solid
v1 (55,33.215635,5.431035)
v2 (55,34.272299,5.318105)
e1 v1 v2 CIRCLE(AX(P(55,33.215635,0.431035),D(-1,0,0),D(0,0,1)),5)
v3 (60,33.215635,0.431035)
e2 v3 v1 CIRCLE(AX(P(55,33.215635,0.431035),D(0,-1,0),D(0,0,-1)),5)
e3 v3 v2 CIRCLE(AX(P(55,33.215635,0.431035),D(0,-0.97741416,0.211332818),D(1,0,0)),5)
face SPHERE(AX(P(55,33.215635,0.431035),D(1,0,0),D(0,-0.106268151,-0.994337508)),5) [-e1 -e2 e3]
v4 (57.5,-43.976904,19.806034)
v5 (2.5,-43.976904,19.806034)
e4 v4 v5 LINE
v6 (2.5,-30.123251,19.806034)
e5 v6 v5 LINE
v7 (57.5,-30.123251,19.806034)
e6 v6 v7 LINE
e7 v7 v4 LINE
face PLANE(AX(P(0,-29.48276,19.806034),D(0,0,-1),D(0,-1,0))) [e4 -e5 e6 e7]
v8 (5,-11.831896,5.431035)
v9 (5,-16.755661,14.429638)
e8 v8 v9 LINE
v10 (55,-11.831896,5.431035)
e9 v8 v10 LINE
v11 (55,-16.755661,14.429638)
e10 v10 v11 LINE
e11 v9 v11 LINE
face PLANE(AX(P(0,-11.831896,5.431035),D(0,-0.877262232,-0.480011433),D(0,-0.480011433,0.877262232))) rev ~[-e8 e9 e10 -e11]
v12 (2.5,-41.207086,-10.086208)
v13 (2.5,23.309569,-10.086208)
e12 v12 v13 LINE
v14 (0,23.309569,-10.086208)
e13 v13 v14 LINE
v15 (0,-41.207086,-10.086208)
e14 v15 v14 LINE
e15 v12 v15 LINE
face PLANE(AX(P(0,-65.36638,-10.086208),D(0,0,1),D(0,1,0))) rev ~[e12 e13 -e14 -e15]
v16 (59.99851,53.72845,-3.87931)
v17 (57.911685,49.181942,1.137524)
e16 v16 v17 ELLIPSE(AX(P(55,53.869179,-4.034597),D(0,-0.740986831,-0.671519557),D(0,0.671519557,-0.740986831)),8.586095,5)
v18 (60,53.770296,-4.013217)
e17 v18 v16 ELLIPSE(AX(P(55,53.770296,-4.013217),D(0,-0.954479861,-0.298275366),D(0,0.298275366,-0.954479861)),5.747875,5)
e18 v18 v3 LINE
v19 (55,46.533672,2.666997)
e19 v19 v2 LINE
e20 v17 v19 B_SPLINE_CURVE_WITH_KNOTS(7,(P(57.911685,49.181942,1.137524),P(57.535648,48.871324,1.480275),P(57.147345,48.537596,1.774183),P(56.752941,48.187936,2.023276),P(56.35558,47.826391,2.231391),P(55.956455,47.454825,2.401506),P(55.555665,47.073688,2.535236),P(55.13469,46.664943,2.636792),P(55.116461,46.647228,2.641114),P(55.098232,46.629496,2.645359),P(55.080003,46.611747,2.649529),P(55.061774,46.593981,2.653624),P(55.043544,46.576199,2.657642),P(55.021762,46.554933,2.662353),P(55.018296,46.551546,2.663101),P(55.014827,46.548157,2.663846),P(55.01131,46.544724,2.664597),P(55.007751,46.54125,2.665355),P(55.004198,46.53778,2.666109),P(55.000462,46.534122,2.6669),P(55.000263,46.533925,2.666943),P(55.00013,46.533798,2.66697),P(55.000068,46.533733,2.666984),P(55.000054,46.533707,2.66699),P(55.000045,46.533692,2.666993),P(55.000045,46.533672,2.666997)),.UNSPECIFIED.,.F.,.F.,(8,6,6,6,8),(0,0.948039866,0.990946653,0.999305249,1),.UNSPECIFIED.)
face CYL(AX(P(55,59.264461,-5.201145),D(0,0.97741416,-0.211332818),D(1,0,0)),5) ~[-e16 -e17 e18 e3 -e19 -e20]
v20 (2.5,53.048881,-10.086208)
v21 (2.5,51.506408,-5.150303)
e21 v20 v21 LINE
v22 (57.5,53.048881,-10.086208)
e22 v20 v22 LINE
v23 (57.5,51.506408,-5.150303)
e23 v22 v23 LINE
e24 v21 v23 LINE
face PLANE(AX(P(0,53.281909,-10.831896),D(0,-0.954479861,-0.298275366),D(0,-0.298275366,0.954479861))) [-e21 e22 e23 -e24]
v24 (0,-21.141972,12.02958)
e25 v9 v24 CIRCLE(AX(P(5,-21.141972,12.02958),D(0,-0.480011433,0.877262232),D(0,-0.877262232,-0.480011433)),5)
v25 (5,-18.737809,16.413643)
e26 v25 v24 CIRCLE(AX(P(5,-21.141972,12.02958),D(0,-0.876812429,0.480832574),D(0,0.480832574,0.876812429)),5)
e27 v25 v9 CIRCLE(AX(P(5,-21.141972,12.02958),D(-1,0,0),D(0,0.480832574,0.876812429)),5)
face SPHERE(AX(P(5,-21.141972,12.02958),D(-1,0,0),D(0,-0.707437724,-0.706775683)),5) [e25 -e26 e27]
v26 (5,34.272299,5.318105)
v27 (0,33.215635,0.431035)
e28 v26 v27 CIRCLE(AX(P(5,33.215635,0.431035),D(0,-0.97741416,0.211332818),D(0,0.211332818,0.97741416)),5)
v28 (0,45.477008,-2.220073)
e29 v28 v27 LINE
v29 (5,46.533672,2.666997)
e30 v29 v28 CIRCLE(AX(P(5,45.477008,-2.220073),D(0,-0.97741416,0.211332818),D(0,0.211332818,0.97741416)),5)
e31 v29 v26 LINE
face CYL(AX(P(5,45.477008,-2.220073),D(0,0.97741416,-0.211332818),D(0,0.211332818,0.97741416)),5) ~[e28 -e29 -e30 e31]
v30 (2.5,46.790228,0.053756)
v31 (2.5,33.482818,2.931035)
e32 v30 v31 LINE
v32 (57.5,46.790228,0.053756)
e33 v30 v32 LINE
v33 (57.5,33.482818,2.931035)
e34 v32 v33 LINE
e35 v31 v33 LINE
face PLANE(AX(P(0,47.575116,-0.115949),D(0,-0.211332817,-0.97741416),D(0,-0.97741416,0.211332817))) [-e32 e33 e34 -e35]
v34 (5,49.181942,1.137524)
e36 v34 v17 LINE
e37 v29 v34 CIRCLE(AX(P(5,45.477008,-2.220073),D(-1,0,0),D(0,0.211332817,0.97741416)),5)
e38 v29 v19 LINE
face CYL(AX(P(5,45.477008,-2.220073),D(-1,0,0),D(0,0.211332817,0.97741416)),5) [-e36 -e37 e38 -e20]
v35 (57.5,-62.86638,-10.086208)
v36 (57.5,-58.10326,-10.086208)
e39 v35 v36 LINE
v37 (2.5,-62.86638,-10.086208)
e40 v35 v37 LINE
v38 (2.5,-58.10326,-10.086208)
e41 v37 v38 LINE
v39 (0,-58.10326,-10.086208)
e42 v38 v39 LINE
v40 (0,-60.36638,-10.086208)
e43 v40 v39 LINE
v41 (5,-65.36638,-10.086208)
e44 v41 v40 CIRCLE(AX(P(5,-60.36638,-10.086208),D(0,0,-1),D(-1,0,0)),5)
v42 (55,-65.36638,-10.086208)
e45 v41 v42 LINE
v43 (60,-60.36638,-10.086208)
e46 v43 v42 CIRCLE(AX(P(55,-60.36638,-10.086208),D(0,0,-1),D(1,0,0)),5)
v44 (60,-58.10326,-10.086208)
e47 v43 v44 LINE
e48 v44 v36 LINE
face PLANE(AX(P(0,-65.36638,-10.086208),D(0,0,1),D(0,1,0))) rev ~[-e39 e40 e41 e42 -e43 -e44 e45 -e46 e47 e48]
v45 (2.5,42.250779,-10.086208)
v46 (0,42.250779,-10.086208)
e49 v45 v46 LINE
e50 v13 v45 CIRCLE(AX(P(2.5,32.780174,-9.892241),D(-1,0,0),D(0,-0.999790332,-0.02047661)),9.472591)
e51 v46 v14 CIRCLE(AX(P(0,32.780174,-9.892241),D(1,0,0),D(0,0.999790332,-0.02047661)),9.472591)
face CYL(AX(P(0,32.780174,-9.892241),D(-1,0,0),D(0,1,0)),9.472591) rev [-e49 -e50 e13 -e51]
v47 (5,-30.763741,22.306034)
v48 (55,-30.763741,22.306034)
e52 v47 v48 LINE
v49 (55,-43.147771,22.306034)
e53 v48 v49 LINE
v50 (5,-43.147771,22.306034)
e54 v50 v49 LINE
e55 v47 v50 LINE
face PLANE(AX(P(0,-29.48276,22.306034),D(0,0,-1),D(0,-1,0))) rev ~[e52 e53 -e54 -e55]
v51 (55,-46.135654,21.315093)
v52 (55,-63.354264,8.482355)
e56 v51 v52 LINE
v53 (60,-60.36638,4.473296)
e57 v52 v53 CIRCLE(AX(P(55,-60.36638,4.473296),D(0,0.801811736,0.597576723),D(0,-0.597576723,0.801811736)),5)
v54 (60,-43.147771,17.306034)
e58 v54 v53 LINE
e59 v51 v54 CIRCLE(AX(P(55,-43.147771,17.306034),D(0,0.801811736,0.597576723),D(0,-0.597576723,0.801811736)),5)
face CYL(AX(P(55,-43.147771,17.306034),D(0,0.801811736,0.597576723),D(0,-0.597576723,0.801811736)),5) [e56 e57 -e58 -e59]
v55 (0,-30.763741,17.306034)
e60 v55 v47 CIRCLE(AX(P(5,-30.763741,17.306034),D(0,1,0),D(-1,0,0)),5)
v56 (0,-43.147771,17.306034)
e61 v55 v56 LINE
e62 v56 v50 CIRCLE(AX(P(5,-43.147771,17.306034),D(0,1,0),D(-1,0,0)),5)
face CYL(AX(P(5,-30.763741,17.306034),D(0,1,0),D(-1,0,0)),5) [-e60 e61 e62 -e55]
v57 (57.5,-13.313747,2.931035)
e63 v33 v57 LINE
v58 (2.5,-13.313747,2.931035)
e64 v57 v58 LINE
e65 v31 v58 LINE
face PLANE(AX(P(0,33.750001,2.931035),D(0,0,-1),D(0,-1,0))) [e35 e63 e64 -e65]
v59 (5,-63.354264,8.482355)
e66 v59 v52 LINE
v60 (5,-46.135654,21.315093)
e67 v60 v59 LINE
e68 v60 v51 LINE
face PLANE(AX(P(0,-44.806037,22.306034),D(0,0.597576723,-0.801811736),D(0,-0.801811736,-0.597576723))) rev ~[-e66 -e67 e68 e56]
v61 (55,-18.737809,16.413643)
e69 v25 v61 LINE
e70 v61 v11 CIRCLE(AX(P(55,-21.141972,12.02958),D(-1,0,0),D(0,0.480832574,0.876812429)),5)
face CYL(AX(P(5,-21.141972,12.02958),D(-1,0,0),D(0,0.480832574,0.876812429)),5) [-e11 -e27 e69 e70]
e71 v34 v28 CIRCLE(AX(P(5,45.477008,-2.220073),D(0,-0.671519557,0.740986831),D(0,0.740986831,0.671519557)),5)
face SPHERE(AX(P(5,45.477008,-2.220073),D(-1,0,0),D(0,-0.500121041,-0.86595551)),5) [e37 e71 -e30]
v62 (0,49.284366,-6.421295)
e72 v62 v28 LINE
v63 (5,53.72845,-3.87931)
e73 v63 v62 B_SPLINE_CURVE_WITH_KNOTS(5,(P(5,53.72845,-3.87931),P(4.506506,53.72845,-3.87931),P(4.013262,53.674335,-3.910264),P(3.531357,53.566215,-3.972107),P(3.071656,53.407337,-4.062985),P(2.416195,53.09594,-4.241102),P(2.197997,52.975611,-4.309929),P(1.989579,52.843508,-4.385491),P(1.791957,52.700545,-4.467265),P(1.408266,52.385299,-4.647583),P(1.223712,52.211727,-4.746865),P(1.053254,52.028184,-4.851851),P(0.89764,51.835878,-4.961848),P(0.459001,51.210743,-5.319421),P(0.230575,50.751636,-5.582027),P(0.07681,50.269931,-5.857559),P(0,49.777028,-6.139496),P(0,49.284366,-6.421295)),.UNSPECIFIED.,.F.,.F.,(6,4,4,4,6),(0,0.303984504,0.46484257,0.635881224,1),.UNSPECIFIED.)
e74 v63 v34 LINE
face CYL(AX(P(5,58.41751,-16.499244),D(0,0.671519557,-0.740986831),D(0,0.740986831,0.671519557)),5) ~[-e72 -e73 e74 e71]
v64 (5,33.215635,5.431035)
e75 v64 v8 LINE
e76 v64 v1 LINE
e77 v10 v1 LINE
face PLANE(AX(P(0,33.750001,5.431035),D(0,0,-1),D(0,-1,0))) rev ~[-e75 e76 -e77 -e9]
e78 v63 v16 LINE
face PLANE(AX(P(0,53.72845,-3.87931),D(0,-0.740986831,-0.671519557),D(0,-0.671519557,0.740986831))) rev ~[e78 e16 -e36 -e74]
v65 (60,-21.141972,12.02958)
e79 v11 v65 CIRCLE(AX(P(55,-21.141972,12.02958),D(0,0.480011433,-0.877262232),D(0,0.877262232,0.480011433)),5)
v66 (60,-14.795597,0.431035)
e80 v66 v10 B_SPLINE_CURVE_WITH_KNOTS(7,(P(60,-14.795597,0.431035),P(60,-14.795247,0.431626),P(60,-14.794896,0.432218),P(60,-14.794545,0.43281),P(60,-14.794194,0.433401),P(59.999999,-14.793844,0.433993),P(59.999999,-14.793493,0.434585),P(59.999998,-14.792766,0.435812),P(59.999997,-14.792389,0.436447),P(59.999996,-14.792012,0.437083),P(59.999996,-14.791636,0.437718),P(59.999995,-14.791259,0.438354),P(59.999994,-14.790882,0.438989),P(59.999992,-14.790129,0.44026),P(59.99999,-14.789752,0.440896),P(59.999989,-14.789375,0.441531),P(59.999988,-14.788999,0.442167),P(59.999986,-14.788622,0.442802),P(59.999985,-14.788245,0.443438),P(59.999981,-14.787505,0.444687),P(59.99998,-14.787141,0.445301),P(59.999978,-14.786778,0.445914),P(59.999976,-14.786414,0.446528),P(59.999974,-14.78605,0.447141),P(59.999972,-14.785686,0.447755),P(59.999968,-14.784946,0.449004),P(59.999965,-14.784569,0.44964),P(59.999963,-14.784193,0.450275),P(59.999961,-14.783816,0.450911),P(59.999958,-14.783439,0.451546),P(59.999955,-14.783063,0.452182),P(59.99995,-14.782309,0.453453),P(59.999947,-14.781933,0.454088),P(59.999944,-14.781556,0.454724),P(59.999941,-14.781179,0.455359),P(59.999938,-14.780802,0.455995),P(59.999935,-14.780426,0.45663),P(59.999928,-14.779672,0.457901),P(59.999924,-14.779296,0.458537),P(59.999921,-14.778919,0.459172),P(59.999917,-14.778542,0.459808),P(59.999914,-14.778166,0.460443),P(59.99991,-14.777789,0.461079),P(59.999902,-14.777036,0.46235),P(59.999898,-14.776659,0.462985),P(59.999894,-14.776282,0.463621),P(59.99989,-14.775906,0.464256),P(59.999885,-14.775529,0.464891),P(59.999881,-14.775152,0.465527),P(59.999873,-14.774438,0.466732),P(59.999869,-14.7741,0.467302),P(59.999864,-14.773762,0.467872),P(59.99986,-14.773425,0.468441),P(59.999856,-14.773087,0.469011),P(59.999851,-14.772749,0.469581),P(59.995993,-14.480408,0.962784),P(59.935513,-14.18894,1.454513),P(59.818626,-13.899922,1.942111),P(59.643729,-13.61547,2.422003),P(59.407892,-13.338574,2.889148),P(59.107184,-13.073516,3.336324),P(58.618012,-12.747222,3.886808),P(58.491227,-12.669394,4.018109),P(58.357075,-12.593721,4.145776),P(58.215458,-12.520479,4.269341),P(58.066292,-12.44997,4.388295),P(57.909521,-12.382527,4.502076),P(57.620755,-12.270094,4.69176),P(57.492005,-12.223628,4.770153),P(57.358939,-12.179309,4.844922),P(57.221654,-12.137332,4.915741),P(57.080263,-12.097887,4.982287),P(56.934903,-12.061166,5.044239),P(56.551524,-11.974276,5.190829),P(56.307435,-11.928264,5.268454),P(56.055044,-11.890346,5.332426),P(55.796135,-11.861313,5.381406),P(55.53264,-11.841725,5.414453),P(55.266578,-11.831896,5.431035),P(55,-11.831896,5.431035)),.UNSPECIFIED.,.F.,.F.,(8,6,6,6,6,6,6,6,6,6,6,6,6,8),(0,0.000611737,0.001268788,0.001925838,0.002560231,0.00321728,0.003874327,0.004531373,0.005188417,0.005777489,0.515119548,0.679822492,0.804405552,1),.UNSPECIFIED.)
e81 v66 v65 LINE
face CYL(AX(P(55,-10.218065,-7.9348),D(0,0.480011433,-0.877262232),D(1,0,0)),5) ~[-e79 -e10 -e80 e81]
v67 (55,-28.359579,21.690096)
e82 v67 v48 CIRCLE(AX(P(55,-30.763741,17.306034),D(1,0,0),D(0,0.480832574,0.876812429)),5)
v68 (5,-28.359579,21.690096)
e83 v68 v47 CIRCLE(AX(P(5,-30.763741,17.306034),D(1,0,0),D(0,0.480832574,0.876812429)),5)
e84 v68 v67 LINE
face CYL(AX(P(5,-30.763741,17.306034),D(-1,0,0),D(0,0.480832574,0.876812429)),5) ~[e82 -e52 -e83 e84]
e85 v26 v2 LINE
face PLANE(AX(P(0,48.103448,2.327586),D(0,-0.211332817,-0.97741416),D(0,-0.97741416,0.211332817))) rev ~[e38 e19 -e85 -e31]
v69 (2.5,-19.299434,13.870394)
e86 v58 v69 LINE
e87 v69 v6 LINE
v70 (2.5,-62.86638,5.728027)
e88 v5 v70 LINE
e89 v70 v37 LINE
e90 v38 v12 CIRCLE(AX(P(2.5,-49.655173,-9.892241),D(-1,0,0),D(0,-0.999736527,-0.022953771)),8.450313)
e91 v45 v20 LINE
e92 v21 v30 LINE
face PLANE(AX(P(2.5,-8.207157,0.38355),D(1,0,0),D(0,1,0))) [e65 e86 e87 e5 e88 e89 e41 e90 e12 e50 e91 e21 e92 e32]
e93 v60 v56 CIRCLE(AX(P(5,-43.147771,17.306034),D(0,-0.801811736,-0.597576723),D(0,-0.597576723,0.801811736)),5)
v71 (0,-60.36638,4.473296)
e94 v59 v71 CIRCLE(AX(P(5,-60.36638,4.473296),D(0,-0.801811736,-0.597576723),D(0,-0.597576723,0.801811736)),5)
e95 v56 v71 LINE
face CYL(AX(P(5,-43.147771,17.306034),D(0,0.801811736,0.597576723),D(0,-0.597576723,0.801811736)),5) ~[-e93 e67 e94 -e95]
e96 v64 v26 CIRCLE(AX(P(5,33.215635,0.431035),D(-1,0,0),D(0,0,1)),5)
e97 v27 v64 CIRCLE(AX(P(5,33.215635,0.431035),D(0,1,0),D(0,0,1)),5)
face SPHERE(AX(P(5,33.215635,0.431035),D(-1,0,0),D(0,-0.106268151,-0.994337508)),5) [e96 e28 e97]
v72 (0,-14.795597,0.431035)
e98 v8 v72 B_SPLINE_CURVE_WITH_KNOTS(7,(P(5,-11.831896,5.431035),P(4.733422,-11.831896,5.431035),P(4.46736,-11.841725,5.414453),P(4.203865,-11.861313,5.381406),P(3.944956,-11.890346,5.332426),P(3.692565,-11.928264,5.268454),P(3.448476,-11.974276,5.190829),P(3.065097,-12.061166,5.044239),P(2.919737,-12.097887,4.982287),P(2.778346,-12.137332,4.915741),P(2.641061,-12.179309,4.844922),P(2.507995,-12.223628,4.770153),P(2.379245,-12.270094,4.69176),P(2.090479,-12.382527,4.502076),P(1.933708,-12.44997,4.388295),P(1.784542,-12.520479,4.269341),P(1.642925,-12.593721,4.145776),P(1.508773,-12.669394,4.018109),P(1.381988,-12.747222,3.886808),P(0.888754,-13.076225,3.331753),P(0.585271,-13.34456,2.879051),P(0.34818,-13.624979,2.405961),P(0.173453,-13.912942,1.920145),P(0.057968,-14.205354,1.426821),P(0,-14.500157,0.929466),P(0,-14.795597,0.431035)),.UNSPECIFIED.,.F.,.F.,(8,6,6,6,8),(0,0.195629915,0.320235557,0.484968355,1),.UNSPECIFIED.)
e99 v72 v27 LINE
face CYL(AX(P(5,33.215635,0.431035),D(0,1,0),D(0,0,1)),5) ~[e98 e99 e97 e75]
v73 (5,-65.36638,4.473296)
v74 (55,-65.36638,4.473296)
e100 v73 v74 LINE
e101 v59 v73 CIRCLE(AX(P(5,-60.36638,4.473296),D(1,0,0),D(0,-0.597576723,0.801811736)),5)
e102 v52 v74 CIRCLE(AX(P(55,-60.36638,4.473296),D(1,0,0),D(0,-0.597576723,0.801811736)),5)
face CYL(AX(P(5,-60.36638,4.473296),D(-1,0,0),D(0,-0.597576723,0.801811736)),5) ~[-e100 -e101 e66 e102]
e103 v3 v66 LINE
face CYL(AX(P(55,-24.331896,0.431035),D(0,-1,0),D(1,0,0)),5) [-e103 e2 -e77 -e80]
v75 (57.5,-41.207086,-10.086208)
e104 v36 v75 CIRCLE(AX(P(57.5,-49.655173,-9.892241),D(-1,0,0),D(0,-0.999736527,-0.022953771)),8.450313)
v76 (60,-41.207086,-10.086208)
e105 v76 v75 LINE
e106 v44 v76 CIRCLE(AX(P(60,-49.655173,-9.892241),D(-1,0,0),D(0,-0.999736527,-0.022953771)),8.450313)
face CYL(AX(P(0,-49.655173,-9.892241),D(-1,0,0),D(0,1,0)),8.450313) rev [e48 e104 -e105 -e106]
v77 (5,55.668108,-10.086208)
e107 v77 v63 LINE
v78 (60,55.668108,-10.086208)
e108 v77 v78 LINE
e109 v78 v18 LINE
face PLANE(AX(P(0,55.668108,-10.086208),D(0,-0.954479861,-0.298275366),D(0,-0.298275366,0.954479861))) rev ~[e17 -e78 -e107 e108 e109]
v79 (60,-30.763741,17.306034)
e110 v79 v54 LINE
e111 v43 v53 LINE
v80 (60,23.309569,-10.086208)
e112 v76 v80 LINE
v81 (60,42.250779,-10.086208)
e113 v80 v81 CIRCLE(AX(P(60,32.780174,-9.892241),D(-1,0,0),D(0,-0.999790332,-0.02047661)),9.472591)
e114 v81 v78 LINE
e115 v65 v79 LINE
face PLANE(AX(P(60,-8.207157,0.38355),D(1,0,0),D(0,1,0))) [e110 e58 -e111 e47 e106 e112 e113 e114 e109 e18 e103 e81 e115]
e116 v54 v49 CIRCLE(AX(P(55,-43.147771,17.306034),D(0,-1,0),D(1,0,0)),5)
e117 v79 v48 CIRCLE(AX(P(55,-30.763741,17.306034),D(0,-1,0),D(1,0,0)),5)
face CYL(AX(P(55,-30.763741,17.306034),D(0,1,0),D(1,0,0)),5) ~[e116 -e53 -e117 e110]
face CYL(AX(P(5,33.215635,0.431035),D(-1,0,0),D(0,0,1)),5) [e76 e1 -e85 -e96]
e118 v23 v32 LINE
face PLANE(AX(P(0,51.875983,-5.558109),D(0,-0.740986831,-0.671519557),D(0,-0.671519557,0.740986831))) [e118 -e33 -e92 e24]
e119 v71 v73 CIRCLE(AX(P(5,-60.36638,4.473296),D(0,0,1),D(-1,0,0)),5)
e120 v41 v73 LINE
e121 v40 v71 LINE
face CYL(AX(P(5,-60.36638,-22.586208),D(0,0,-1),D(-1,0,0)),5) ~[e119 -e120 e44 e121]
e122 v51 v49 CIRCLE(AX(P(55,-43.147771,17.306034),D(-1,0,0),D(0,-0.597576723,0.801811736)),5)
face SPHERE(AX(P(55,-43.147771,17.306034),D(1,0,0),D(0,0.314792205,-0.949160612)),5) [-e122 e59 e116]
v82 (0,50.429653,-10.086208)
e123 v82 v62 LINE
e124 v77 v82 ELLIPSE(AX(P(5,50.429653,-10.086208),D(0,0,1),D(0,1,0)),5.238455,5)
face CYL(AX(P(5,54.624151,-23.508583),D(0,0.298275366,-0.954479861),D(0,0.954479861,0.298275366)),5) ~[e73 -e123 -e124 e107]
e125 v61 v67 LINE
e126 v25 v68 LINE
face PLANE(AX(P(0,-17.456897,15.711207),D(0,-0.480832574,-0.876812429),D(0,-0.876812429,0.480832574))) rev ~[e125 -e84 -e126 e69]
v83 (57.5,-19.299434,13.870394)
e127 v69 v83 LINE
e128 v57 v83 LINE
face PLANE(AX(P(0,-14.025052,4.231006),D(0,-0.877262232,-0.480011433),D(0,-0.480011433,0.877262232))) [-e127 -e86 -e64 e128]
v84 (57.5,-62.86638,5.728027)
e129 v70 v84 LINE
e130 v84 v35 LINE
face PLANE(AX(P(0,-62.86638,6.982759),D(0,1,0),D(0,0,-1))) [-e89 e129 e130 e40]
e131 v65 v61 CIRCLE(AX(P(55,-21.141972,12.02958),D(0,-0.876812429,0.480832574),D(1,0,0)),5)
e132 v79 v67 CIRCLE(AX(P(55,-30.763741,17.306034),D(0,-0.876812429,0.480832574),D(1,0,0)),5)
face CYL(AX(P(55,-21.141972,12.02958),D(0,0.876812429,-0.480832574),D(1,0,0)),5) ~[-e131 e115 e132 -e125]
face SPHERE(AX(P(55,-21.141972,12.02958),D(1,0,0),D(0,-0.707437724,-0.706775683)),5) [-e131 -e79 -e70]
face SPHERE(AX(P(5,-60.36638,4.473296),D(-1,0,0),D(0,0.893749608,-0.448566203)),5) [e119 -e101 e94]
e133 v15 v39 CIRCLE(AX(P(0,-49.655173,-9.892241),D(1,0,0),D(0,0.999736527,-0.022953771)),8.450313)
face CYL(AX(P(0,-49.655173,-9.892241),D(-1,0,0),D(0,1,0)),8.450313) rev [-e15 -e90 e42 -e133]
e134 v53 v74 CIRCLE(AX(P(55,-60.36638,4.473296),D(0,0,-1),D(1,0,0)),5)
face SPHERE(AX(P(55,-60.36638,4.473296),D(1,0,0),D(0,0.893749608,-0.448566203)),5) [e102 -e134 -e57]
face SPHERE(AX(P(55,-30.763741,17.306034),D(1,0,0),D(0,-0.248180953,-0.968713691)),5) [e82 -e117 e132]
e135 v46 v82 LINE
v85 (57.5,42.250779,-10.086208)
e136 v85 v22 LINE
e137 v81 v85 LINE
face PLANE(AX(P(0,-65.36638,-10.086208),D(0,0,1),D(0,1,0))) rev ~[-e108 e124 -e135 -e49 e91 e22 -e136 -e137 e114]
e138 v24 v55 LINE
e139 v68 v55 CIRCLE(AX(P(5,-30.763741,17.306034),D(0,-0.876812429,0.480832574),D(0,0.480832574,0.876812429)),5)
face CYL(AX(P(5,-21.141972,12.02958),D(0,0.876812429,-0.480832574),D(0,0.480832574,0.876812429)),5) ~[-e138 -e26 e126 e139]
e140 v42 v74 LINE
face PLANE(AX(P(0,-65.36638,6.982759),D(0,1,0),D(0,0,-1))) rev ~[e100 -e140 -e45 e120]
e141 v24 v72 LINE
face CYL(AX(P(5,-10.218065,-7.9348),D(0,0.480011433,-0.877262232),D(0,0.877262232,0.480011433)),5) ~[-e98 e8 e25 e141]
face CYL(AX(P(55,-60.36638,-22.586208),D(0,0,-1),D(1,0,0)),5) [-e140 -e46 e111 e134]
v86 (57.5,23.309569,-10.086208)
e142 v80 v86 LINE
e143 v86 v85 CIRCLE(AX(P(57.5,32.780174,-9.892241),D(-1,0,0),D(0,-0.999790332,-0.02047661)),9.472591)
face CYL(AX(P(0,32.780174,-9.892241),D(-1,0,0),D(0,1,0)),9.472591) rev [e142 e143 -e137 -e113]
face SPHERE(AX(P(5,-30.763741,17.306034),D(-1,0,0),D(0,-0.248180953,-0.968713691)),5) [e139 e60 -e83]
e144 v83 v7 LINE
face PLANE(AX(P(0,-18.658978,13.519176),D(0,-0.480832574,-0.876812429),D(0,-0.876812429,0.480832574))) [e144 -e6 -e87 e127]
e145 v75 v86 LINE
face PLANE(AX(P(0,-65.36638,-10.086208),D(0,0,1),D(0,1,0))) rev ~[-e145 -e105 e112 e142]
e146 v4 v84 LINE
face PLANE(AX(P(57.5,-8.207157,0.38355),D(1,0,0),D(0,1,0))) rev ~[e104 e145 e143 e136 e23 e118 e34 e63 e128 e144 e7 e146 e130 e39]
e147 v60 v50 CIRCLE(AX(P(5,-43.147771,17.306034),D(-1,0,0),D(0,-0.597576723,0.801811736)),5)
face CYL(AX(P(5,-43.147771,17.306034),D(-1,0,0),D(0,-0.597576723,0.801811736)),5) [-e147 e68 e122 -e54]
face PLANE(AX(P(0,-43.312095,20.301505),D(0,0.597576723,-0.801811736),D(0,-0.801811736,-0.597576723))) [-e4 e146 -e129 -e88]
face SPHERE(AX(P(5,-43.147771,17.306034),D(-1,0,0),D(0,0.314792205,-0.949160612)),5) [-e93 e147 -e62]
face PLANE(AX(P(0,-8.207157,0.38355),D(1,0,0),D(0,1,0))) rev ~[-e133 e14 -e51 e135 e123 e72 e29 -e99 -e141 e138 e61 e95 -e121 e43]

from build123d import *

# Parameters (mm, degrees)
F1_DEPTH      = 60
F2_T          = -2.5
F3_T1_DEPTH   = 31.5029107171
F3_T3_DEPTH   = 19.2704775269
F3_T5_DEPTH   = 59.0151251094
F3_T7_DEPTH   = 50
F3_T9_DEPTH   = 12.544705842
F3_T11_DEPTH  = 26.6507558857
F3_T13_DEPTH  = 10.9735782615
F3_T15_DEPTH  = 12.384029335
F3_T17_DEPTH  = 21.4746284083
F3_T19_DEPTH  = 27.0595039158
F3_T24_DEPTH  = 5
F3_T30_DEPTH  = 5
F3_T36_DEPTH  = 5
F3_T42_DEPTH  = 5
F3_T48_DEPTH  = 5
F3_T54_DEPTH  = 5
F3_T60_DEPTH  = 5
F3_T66_DEPTH  = 5
F3_T72_DEPTH  = 5
F3_T78_DEPTH  = 5
F3_T84_DEPTH  = 5
F3_T90_DEPTH  = 57.5475311177
F3_T95_DEPTH  = 22.7575976563
F3_T100_DEPTH = 57.5475311177
F3_T105_DEPTH = 22.7575976563
F3_T111_DEPTH = 22.7575976563
F3_T115_DEPTH = 57.5475311177
F3_T122_DEPTH = 57.5475311177
F3_T126_DEPTH = 22.7575976563
F4_R          = 8.968677233
F4_R_2        = 8.5168287605
F5_DEPTH      = 60
F6_R          = 9.472590991
F6_R_2        = 8.4503132789
F7_DEPTH      = 65.4


# Not quite as in the source:
# - a fillet or chamfer that OpenCascade refuses, or shapes differently, is made with other operations: its cross-section is extruded or revolved along the edge and cut away or added


with BuildPart() as f1:
    # F0 (on Right) → F1 (new body)
    with BuildSketch(Plane.YZ):
        Polygon((-44.8060370982, 22.3060343415), (-65.3663799167, 6.9827586412), (-65.3663799167, -10.0862076506), (55.6681081653, -10.0862076506), (53.7284500897, -3.8793103304), (48.1034480035, 2.3275862914), (33.7500013411, 5.4310346022), (20.5603465438, 5.4310346022), (4.4612074271, 5.4310346022), (-11.8318963796, 5.4310346022), (-17.4568966031, 15.7112069428), (-29.4827595353, 22.3060343415), align=None)
    extrude(amount=F1_DEPTH)

    # F2
    f2_openings = [f1.faces().sort_by_distance(p)[0] for p in [
        (30, -4.849136, -10.086208),
    ]]
    offset(amount=F2_T, openings=f2_openings, kind=Kind.INTERSECTION)

    # F3: fillet of radius 5 on 22 edges, made by hand

    # F3_s2 → F3_t1 (cut)
    with BuildSketch(Plane(origin=(0, 11.5526545627, -36.9684438457), x_dir=(1, 0, 0), z_dir=(0, -0.2982753662, 0.9544798614))):
        with BuildLine():
            ThreePointArc((5, 50.125620888), (1.4644660941, 48.661154794), (0, 45.125620888))
            Line((0, 45.125620888), (0, 50.125620888))
            Line((0, 50.125620888), (5, 50.125620888))
        make_face()
    extrude(amount=F3_T1_DEPTH, mode=Mode.SUBTRACT)

    # F3_s4 → F3_t3 (cut)
    with BuildSketch(Plane(origin=(0, 34.5525169769, -38.1269015747), x_dir=(1, 0, 0), z_dir=(0, -0.6715195573, 0.7409868313))):
        with BuildLine():
            ThreePointArc((5, 37.2070412259), (1.4644660941, 35.7425751318), (0, 32.2070412259))
            Line((0, 32.2070412259), (0, 37.2070412259))
            Line((0, 37.2070412259), (5, 37.2070412259))
        make_face()
    extrude(amount=F3_T3_DEPTH, mode=Mode.SUBTRACT)

    # F3_s6 → F3_t5 (cut)
    with BuildSketch(Plane.YZ.offset(5)):
        with BuildLine():
            ThreePointArc((46.533671949, 2.6669973721), (47.9776130651, 2.1097041201), (49.1819420179, 1.1375243586))
            Line((49.1819420179, 1.1375243586), (48.1034480035, 2.3275862914))
            Line((48.1034480035, 2.3275862914), (46.533671949, 2.6669973721))
        make_face()
    extrude(amount=F3_T5_DEPTH, mode=Mode.SUBTRACT)

    # F3_s8 → F3_t7 (cut)
    with BuildSketch(Plane.YZ.offset(5)):
        with BuildLine():
            ThreePointArc((33.2156347381, 5.4310346022), (33.7469754945, 5.4027221427), (34.2722988256, 5.3181054024))
            Line((34.2722988256, 5.3181054024), (33.7500013411, 5.4310346022))
            Line((33.7500013411, 5.4310346022), (33.2156347381, 5.4310346022))
        make_face()
        with BuildLine():
            ThreePointArc((-46.1356544501, 21.3150930211), (-44.7217318567, 22.051837403), (-43.147770834, 22.3060343415))
            Line((-43.147770834, 22.3060343415), (-44.8060370982, 22.3060343415))
            Line((-44.8060370982, 22.3060343415), (-46.1356544501, 21.3150930211))
        make_face()
        with BuildLine():
            ThreePointArc((-63.3542635327, 8.4823549449), (-64.8351279561, 6.7161272798), (-65.3663799167, 4.4732962652))
            Line((-65.3663799167, 4.4732962652), (-65.3663799167, 6.9827586412))
            Line((-65.3663799167, 6.9827586412), (-63.3542635327, 8.4823549449))
        make_face()
        with BuildLine():
            ThreePointArc((-28.3595786282, 21.6900964864), (-29.5228367333, 22.1496027948), (-30.763741499, 22.3060343415))
            Line((-30.763741499, 22.3060343415), (-29.4827595353, 22.3060343415))
            Line((-29.4827595353, 22.3060343415), (-28.3595786282, 21.6900964864))
        make_face()
        with BuildLine():
            ThreePointArc((-18.7378088181, 16.4136426032), (-17.604783068, 15.5634588744), (-16.7556605267, 14.4296376218))
            Line((-16.7556605267, 14.4296376218), (-17.4568966031, 15.7112069428))
            Line((-17.4568966031, 15.7112069428), (-18.7378088181, 16.4136426032))
        make_face()
    extrude(amount=F3_T7_DEPTH, mode=Mode.SUBTRACT)

    # F3_s10 → F3_t9 (cut)
    with BuildSketch(Plane(origin=(0, 43.9045114329, -9.492868511), x_dir=(1, 0, 0), z_dir=(0, -0.97741416, 0.2113328175))):
        with BuildLine():
            ThreePointArc((5, 12.4408529979), (1.4644660941, 10.9763869038), (0, 7.4408529979))
            Line((0, 7.4408529979), (0, 12.4408529979))
            Line((0, 12.4408529979), (5, 12.4408529979))
        make_face()
    extrude(amount=F3_T9_DEPTH, mode=Mode.SUBTRACT)

    # F3_s12 → F3_t11 (cut)
    with BuildSketch(Plane(origin=(0, 57.6919644879, -12.4739398105), x_dir=(1, 0, 0), z_dir=(0, -0.97741416, 0.2113328175))):
        with BuildLine():
            ThreePointArc((60, 7.4408529979), (58.5355339059, 10.9763869038), (55, 12.4408529979))
            Line((55, 12.4408529979), (60, 12.4408529979))
            Line((60, 12.4408529979), (60, 7.4408529979))
        make_face()
    extrude(amount=F3_T11_DEPTH, mode=Mode.SUBTRACT)

    # F3_s14 → F3_t13 (cut)
    with BuildSketch(Plane(origin=(0, -21.3256194356, 11.6946933572), x_dir=(1, 0, 0), z_dir=(0, -0.876812429, 0.4808325742))):
        with BuildLine():
            ThreePointArc((5, 5.3819369913), (1.4644660941, 3.9174708973), (0, 0.3819369913))
            Line((0, 0.3819369913), (0, 5.3819369913))
            Line((0, 5.3819369913), (5, 5.3819369913))
        make_face()
        with BuildLine():
            ThreePointArc((60, 0.3819369913), (58.5355339059, 3.9174708973), (55, 5.3819369913))
            Line((55, 5.3819369913), (60, 5.3819369913))
            Line((60, 5.3819369913), (60, 0.3819369913))
        make_face()
    extrude(amount=F3_T13_DEPTH, mode=Mode.SUBTRACT)

    # F3_s16 → F3_t15 (cut)
    with BuildSketch(Plane.XZ.offset(30.763741499)):
        with BuildLine():
            ThreePointArc((0, 17.3060343415), (1.4644660941, 20.8415682474), (5, 22.3060343415))
            Line((5, 22.3060343415), (0, 22.3060343415))
            Line((0, 22.3060343415), (0, 17.3060343415))
        make_face()
        with BuildLine():
            ThreePointArc((60, 17.3060343415), (58.5355339059, 20.8415682474), (55, 22.3060343415))
            Line((55, 22.3060343415), (60, 22.3060343415))
            Line((60, 22.3060343415), (60, 17.3060343415))
        make_face()
    extrude(amount=F3_T15_DEPTH, mode=Mode.SUBTRACT)

    # F3_s18 → F3_t17 (cut)
    with BuildSketch(Plane(origin=(0, -19.4477077147, -14.4940475789), x_dir=(1, 0, 0), z_dir=(0, -0.8018117359, -0.5975767232))):
        with BuildLine():
            ThreePointArc((5, 44.660284946), (1.4644660941, 43.195818852), (0, 39.660284946))
            Line((0, 39.660284946), (0, 44.660284946))
            Line((0, 44.660284946), (5, 44.660284946))
        make_face()
        with BuildLine():
            ThreePointArc((55, 44.660284946), (58.5355339059, 43.195818852), (60, 39.660284946))
            Line((60, 39.660284946), (60, 44.660284946))
            Line((60, 44.660284946), (55, 44.660284946))
        make_face()
    extrude(amount=F3_T17_DEPTH, mode=Mode.SUBTRACT)

    # F3_s20 → F3_t19 (cut)
    with BuildSketch(Plane.XY.offset(-22.5862076506)):
        with BuildLine():
            ThreePointArc((0, -60.3663799167), (1.4644660941, -63.9019138226), (5, -65.3663799167))
            Line((5, -65.3663799167), (0, -65.3663799167))
            Line((0, -65.3663799167), (0, -60.3663799167))
        make_face()
        with BuildLine():
            ThreePointArc((60, -60.3663799167), (58.5355339059, -63.9019138226), (55, -65.3663799167))
            Line((55, -65.3663799167), (60, -65.3663799167))
            Line((60, -65.3663799167), (60, -60.3663799167))
        make_face()
    extrude(amount=F3_T19_DEPTH, mode=Mode.SUBTRACT)


with BuildPart() as f3_tool22:
    # F3_s23 → F3_t24 (new body)
    with BuildSketch(Plane.YZ.offset(5)):
        Polygon((45.4770078615, -2.2200734281), (46.533671949, 2.6669973721), (48.1034480035, 2.3275862914), (49.1819420179, 1.1375243586), align=None)
    extrude(amount=-F3_T24_DEPTH)

    # F3_s25 → F3_t26 (revolve, cut)
    with BuildSketch(Plane(origin=(5, 45.4770078615, -2.2200734281), x_dir=(0, -0.5001210407, -0.8659555096), z_dir=(0, 0.8659555096, -0.5001210407))):
        with BuildLine():
            ThreePointArc((0, -5), (5, 0), (0, 5))
            Line((0, 5), (0, -5))
        make_face()
    revolve(axis=Axis((5, 45.4770078615, -2.2200734281), (-1, 0, 0)), mode=Mode.SUBTRACT)


with BuildPart() as f1_1:
    add(f1.part)

    # F3_t21: cut F3_tool22
    add(f3_tool22.part, mode=Mode.SUBTRACT)


with BuildPart() as f3_tool28:
    # F3_s29 → F3_t30 (new body)
    with BuildSketch(Plane.YZ.offset(5)):
        Polygon((33.2156347381, 0.4310346022), (33.2156347381, 5.4310346022), (33.7500013411, 5.4310346022), (34.2722988256, 5.3181054024), align=None)
    extrude(amount=-F3_T30_DEPTH)

    # F3_s31 → F3_t32 (revolve, cut)
    with BuildSketch(Plane(origin=(5, 33.2156347381, 0.4310346022), x_dir=(0, -0.1062681513, -0.9943375081), z_dir=(0, 0.9943375081, -0.1062681513))):
        with BuildLine():
            ThreePointArc((0, -5), (5, 0), (0, 5))
            Line((0, 5), (0, -5))
        make_face()
    revolve(axis=Axis((5, 33.2156347381, 0.4310346022), (-1, 0, 0)), mode=Mode.SUBTRACT)


with BuildPart() as f1_2:
    add(f1_1.part)

    # F3_t27: cut F3_tool28
    add(f3_tool28.part, mode=Mode.SUBTRACT)


with BuildPart() as f3_tool34:
    # F3_s35 → F3_t36 (new body)
    with BuildSketch(Plane.YZ.offset(55)):
        Polygon((33.2156347381, 0.4310346022), (33.2156347381, 5.4310346022), (33.7500013411, 5.4310346022), (34.2722988256, 5.3181054024), align=None)
    extrude(amount=F3_T36_DEPTH)

    # F3_s37 → F3_t38 (revolve, cut)
    with BuildSketch(Plane(origin=(55, 33.2156347381, 0.4310346022), x_dir=(0, -0.1062681513, -0.9943375081), z_dir=(0, -0.9943375081, 0.1062681513))):
        with BuildLine():
            ThreePointArc((0, -5), (5, 0), (0, 5))
            Line((0, 5), (0, -5))
        make_face()
    revolve(axis=Axis((55, 33.2156347381, 0.4310346022), (1, 0, 0)), mode=Mode.SUBTRACT)


with BuildPart() as f1_3:
    add(f1_2.part)

    # F3_t33: cut F3_tool34
    add(f3_tool34.part, mode=Mode.SUBTRACT)


with BuildPart() as f3_tool40:
    # F3_s41 → F3_t42 (new body)
    with BuildSketch(Plane.YZ.offset(5)):
        Polygon((-21.1419716889, 12.0295804583), (-18.7378088181, 16.4136426032), (-17.4568966031, 15.7112069428), (-16.7556605267, 14.4296376218), align=None)
    extrude(amount=-F3_T42_DEPTH)

    # F3_s43 → F3_t44 (revolve, cut)
    with BuildSketch(Plane(origin=(5, -21.1419716889, 12.0295804583), x_dir=(0, -0.7074377242, -0.7067756832), z_dir=(0, 0.7067756832, -0.7074377242))):
        with BuildLine():
            ThreePointArc((0, -5), (5, 0), (0, 5))
            Line((0, 5), (0, -5))
        make_face()
    revolve(axis=Axis((5, -21.1419716889, 12.0295804583), (-1, 0, 0)), mode=Mode.SUBTRACT)


with BuildPart() as f1_4:
    add(f1_3.part)

    # F3_t39: cut F3_tool40
    add(f3_tool40.part, mode=Mode.SUBTRACT)


with BuildPart() as f3_tool46:
    # F3_s47 → F3_t48 (new body)
    with BuildSketch(Plane.YZ.offset(5)):
        Polygon((-30.763741499, 17.3060343415), (-28.3595786282, 21.6900964864), (-29.4827595353, 22.3060343415), (-30.763741499, 22.3060343415), align=None)
    extrude(amount=-F3_T48_DEPTH)

    # F3_s49 → F3_t50 (revolve, cut)
    with BuildSketch(Plane(origin=(5, -30.763741499, 17.3060343415), x_dir=(0, -0.2481809531, -0.9687136907), z_dir=(0, 0.9687136907, -0.2481809531))):
        with BuildLine():
            ThreePointArc((0, -5), (5, 0), (0, 5))
            Line((0, 5), (0, -5))
        make_face()
    revolve(axis=Axis((5, -30.763741499, 17.3060343415), (-1, 0, 0)), mode=Mode.SUBTRACT)


with BuildPart() as f1_5:
    add(f1_4.part)

    # F3_t45: cut F3_tool46
    add(f3_tool46.part, mode=Mode.SUBTRACT)


with BuildPart() as f3_tool52:
    # F3_s53 → F3_t54 (new body)
    with BuildSketch(Plane.YZ.offset(5)):
        Polygon((-43.147770834, 17.3060343415), (-46.1356544501, 21.3150930211), (-44.8060370982, 22.3060343415), (-43.147770834, 22.3060343415), align=None)
    extrude(amount=-F3_T54_DEPTH)

    # F3_s55 → F3_t56 (revolve, cut)
    with BuildSketch(Plane(origin=(5, -43.147770834, 17.3060343415), x_dir=(0, 0.3147922045, -0.9491606123), z_dir=(0, 0.9491606123, 0.3147922045))):
        with BuildLine():
            ThreePointArc((0, -5), (5, 0), (0, 5))
            Line((0, 5), (0, -5))
        make_face()
    revolve(axis=Axis((5, -43.147770834, 17.3060343415), (-1, 0, 0)), mode=Mode.SUBTRACT)


with BuildPart() as f1_6:
    add(f1_5.part)

    # F3_t51: cut F3_tool52
    add(f3_tool52.part, mode=Mode.SUBTRACT)


with BuildPart() as f3_tool58:
    # F3_s59 → F3_t60 (new body)
    with BuildSketch(Plane.YZ.offset(5)):
        Polygon((-60.3663799167, 4.4732962652), (-65.3663799167, 4.4732962652), (-65.3663799167, 6.9827586412), (-63.3542635327, 8.4823549449), align=None)
    extrude(amount=-F3_T60_DEPTH)

    # F3_s61 → F3_t62 (revolve, cut)
    with BuildSketch(Plane(origin=(5, -60.3663799167, 4.4732962652), x_dir=(0, 0.8937496079, -0.4485662029), z_dir=(0, 0.4485662029, 0.8937496079))):
        with BuildLine():
            ThreePointArc((0, -5), (5, 0), (0, 5))
            Line((0, 5), (0, -5))
        make_face()
    revolve(axis=Axis((5, -60.3663799167, 4.4732962652), (-1, 0, 0)), mode=Mode.SUBTRACT)


with BuildPart() as f1_7:
    add(f1_6.part)

    # F3_t57: cut F3_tool58
    add(f3_tool58.part, mode=Mode.SUBTRACT)


with BuildPart() as f3_tool64:
    # F3_s65 → F3_t66 (new body)
    with BuildSketch(Plane.YZ.offset(55)):
        Polygon((-21.1419716889, 12.0295804583), (-18.7378088181, 16.4136426032), (-17.4568966031, 15.7112069428), (-16.7556605267, 14.4296376218), align=None)
    extrude(amount=F3_T66_DEPTH)

    # F3_s67 → F3_t68 (revolve, cut)
    with BuildSketch(Plane(origin=(55, -21.1419716889, 12.0295804583), x_dir=(0, -0.7074377242, -0.7067756832), z_dir=(0, -0.7067756832, 0.7074377242))):
        with BuildLine():
            ThreePointArc((0, -5), (5, 0), (0, 5))
            Line((0, 5), (0, -5))
        make_face()
    revolve(axis=Axis((55, -21.1419716889, 12.0295804583), (1, 0, 0)), mode=Mode.SUBTRACT)


with BuildPart() as f1_8:
    add(f1_7.part)

    # F3_t63: cut F3_tool64
    add(f3_tool64.part, mode=Mode.SUBTRACT)


with BuildPart() as f3_tool70:
    # F3_s71 → F3_t72 (new body)
    with BuildSketch(Plane.YZ.offset(55)):
        Polygon((-30.763741499, 17.3060343415), (-28.3595786282, 21.6900964864), (-29.4827595353, 22.3060343415), (-30.763741499, 22.3060343415), align=None)
    extrude(amount=F3_T72_DEPTH)

    # F3_s73 → F3_t74 (revolve, cut)
    with BuildSketch(Plane(origin=(55, -30.763741499, 17.3060343415), x_dir=(0, -0.2481809531, -0.9687136907), z_dir=(0, -0.9687136907, 0.2481809531))):
        with BuildLine():
            ThreePointArc((0, -5), (5, 0), (0, 5))
            Line((0, 5), (0, -5))
        make_face()
    revolve(axis=Axis((55, -30.763741499, 17.3060343415), (1, 0, 0)), mode=Mode.SUBTRACT)


with BuildPart() as f1_9:
    add(f1_8.part)

    # F3_t69: cut F3_tool70
    add(f3_tool70.part, mode=Mode.SUBTRACT)


with BuildPart() as f3_tool76:
    # F3_s77 → F3_t78 (new body)
    with BuildSketch(Plane.YZ.offset(55)):
        Polygon((-43.147770834, 17.3060343415), (-43.147770834, 22.3060343415), (-44.8060370982, 22.3060343415), (-46.1356544501, 21.3150930211), align=None)
    extrude(amount=F3_T78_DEPTH)

    # F3_s79 → F3_t80 (revolve, cut)
    with BuildSketch(Plane(origin=(55, -43.147770834, 17.3060343415), x_dir=(0, 0.3147922045, -0.9491606123), z_dir=(0, -0.9491606123, -0.3147922045))):
        with BuildLine():
            ThreePointArc((0, -5), (5, 0), (0, 5))
            Line((0, 5), (0, -5))
        make_face()
    revolve(axis=Axis((55, -43.147770834, 17.3060343415), (1, 0, 0)), mode=Mode.SUBTRACT)


with BuildPart() as f1_10:
    add(f1_9.part)

    # F3_t75: cut F3_tool76
    add(f3_tool76.part, mode=Mode.SUBTRACT)


with BuildPart() as f3_tool82:
    # F3_s83 → F3_t84 (new body)
    with BuildSketch(Plane.YZ.offset(55)):
        Polygon((-60.3663799167, 4.4732962652), (-65.3663799167, 4.4732962652), (-65.3663799167, 6.9827586412), (-63.3542635327, 8.4823549449), align=None)
    extrude(amount=F3_T84_DEPTH)

    # F3_s85 → F3_t86 (revolve, cut)
    with BuildSketch(Plane(origin=(55, -60.3663799167, 4.4732962652), x_dir=(0, 0.8937496079, -0.4485662029), z_dir=(0, -0.4485662029, -0.8937496079))):
        with BuildLine():
            ThreePointArc((0, -5), (5, 0), (0, 5))
            Line((0, 5), (0, -5))
        make_face()
    revolve(axis=Axis((55, -60.3663799167, 4.4732962652), (1, 0, 0)), mode=Mode.SUBTRACT)


with BuildPart() as f1_11:
    add(f1_10.part)

    # F3_t81: cut F3_tool82
    add(f3_tool82.part, mode=Mode.SUBTRACT)


with BuildPart() as f3_tool88:
    # F3_s89 → F3_t90 (new body)
    with BuildSketch(Plane.XZ.offset(-33.2156347381)):
        with BuildLine():
            ThreePointArc((5, 5.4310346022), (1.4644660941, 3.9665685082), (0, 0.4310346022))
            Line((0, 0.4310346022), (0, 5.4310346022))
            Line((0, 5.4310346022), (5, 5.4310346022))
        make_face()
    extrude(amount=F3_T90_DEPTH)

    split(bisect_by=Plane(origin=(0, -6.818711183, -3.7309930863), x_dir=(1, 0, 0), z_dir=(0, 0.8772622324, 0.4800114327)), keep=Keep.TOP)


with BuildPart() as f1_12:
    add(f1_11.part)

    # F3_t87: cut F3_tool88
    add(f3_tool88.part, mode=Mode.SUBTRACT)


with BuildPart() as f3_tool93:
    # F3_s94 → F3_t95 (new body)
    with BuildSketch(Plane(origin=(0, 0.9869577122, -1.8037502171), x_dir=(1, 0, 0), z_dir=(0, -0.4800114327, 0.8772622324))):
        with BuildLine():
            ThreePointArc((5, -7.7727171316), (1.4644660941, -9.2371832257), (0, -12.7727171316))
            Line((0, -12.7727171316), (0, -7.7727171316))
            Line((0, -7.7727171316), (5, -7.7727171316))
        make_face()
    extrude(amount=F3_T95_DEPTH)

    split(bisect_by=Plane.XY.offset(5.4310346022), keep=Keep.TOP)


with BuildPart() as f1_13:
    add(f1_12.part)

    # F3_t92: cut F3_tool93
    add(f3_tool93.part, mode=Mode.SUBTRACT)


with BuildPart() as f3_tool98:
    # F3_s99 → F3_t100 (new body)
    with BuildSketch(Plane.XZ.offset(24.3318963796)):
        with BuildLine():
            ThreePointArc((60, 0.4310346022), (58.5355339059, 3.9665685082), (55, 5.4310346022))
            Line((55, 5.4310346022), (60, 5.4310346022))
            Line((60, 5.4310346022), (60, 0.4310346022))
        make_face()
    extrude(amount=-F3_T100_DEPTH)

    split(bisect_by=Plane(origin=(0, -6.818711183, -3.7309930863), x_dir=(1, 0, 0), z_dir=(0, 0.8772622324, 0.4800114327)), keep=Keep.TOP)


with BuildPart() as f1_14:
    add(f1_13.part)

    # F3_t97: cut F3_tool98
    add(f3_tool98.part, mode=Mode.SUBTRACT)


with BuildPart() as f3_tool103:
    # F3_s104 → F3_t105 (new body)
    with BuildSketch(Plane(origin=(0, 0.9869577122, -1.8037502171), x_dir=(1, 0, 0), z_dir=(0, -0.4800114327, 0.8772622324))):
        with BuildLine():
            ThreePointArc((60, -12.7727171316), (58.5355339059, -9.2371832257), (55, -7.7727171316))
            Line((55, -7.7727171316), (60, -7.7727171316))
            Line((60, -7.7727171316), (60, -12.7727171316))
        make_face()
    extrude(amount=F3_T105_DEPTH)

    split(bisect_by=Plane.XY.offset(5.4310346022), keep=Keep.TOP)


with BuildPart() as f1_15:
    add(f1_14.part)

    # F3_t102: cut F3_tool103
    add(f3_tool103.part, mode=Mode.SUBTRACT)


with BuildPart() as f3_tool109:
    # F3_s110 → F3_t111 (new body)
    with BuildSketch(Plane(origin=(0, 0.9869577122, -1.8037502171), x_dir=(1, 0, 0), z_dir=(0, -0.4800114327, 0.8772622324))):
        with BuildLine():
            ThreePointArc((5, -7.7727171316), (1.4644660941, -9.2371832257), (0, -12.7727171316))
            Line((0, -12.7727171316), (0, -7.7727171316))
            Line((0, -7.7727171316), (5, -7.7727171316))
        make_face()
    extrude(amount=F3_T111_DEPTH)

    split(bisect_by=Plane.XY.offset(5.4310346022), keep=Keep.BOTTOM)


with BuildPart() as f3_tool113:
    # F3_s114 → F3_t115 (new body)
    with BuildSketch(Plane.XZ.offset(-33.2156347381)):
        with BuildLine():
            ThreePointArc((5, 5.4310346022), (1.4644660941, 3.9665685082), (0, 0.4310346022))
            Line((0, 0.4310346022), (0, 5.4310346022))
            Line((0, 5.4310346022), (5, 5.4310346022))
        make_face()
    extrude(amount=F3_T115_DEPTH)

    split(bisect_by=Plane(origin=(0, -6.818711183, -3.7309930863), x_dir=(1, 0, 0), z_dir=(0, -0.8772622324, -0.4800114327)), keep=Keep.TOP)


with BuildPart() as f3_tool109_1:
    add(f3_tool109.part)

    # F3_t117: intersect F3_tool113
    add(f3_tool113.part, mode=Mode.INTERSECT)


with BuildPart() as f1_16:
    add(f1_15.part)

    # F3_t107: cut F3_tool109
    add(f3_tool109_1.part, mode=Mode.SUBTRACT)


with BuildPart() as f3_tool120:
    # F3_s121 → F3_t122 (new body)
    with BuildSketch(Plane.XZ.offset(24.3318963796)):
        with BuildLine():
            ThreePointArc((60, 0.4310346022), (58.5355339059, 3.9665685082), (55, 5.4310346022))
            Line((55, 5.4310346022), (60, 5.4310346022))
            Line((60, 5.4310346022), (60, 0.4310346022))
        make_face()
    extrude(amount=-F3_T122_DEPTH)

    split(bisect_by=Plane(origin=(0, -6.818711183, -3.7309930863), x_dir=(1, 0, 0), z_dir=(0, -0.8772622324, -0.4800114327)), keep=Keep.TOP)


with BuildPart() as f3_tool124:
    # F3_s125 → F3_t126 (new body)
    with BuildSketch(Plane(origin=(0, 0.9869577122, -1.8037502171), x_dir=(1, 0, 0), z_dir=(0, -0.4800114327, 0.8772622324))):
        with BuildLine():
            ThreePointArc((60, -12.7727171316), (58.5355339059, -9.2371832257), (55, -7.7727171316))
            Line((55, -7.7727171316), (60, -7.7727171316))
            Line((60, -7.7727171316), (60, -12.7727171316))
        make_face()
    extrude(amount=F3_T126_DEPTH)

    split(bisect_by=Plane.XY.offset(5.4310346022), keep=Keep.BOTTOM)


with BuildPart() as f3_tool120_1:
    add(f3_tool120.part)

    # F3_t128: intersect F3_tool124
    add(f3_tool124.part, mode=Mode.INTERSECT)


with BuildPart() as f1_17:
    add(f1_16.part)

    # F3_t118: cut F3_tool120
    add(f3_tool120_1.part, mode=Mode.SUBTRACT)

    # F4 (on Right) → F5 (cut)
    with BuildSketch(Plane.YZ):
        with Locations((33.9439660311, -9.892241098)):
            Circle(F4_R)
        with Locations((-48.2974201441, -9.698276408)):
            Circle(F4_R_2)
    extrude(amount=-F5_DEPTH, mode=Mode.SUBTRACT)

    # F6 (on Right) → F7 (cut)
    with BuildSketch(Plane.YZ):
        with Locations((32.780174166, -9.892241098)):
            Circle(F6_R)
        with Locations((-49.6551729739, -9.892241098)):
            Circle(F6_R_2)
    extrude(amount=F7_DEPTH, mode=Mode.SUBTRACT)


solid = f1_17.part
